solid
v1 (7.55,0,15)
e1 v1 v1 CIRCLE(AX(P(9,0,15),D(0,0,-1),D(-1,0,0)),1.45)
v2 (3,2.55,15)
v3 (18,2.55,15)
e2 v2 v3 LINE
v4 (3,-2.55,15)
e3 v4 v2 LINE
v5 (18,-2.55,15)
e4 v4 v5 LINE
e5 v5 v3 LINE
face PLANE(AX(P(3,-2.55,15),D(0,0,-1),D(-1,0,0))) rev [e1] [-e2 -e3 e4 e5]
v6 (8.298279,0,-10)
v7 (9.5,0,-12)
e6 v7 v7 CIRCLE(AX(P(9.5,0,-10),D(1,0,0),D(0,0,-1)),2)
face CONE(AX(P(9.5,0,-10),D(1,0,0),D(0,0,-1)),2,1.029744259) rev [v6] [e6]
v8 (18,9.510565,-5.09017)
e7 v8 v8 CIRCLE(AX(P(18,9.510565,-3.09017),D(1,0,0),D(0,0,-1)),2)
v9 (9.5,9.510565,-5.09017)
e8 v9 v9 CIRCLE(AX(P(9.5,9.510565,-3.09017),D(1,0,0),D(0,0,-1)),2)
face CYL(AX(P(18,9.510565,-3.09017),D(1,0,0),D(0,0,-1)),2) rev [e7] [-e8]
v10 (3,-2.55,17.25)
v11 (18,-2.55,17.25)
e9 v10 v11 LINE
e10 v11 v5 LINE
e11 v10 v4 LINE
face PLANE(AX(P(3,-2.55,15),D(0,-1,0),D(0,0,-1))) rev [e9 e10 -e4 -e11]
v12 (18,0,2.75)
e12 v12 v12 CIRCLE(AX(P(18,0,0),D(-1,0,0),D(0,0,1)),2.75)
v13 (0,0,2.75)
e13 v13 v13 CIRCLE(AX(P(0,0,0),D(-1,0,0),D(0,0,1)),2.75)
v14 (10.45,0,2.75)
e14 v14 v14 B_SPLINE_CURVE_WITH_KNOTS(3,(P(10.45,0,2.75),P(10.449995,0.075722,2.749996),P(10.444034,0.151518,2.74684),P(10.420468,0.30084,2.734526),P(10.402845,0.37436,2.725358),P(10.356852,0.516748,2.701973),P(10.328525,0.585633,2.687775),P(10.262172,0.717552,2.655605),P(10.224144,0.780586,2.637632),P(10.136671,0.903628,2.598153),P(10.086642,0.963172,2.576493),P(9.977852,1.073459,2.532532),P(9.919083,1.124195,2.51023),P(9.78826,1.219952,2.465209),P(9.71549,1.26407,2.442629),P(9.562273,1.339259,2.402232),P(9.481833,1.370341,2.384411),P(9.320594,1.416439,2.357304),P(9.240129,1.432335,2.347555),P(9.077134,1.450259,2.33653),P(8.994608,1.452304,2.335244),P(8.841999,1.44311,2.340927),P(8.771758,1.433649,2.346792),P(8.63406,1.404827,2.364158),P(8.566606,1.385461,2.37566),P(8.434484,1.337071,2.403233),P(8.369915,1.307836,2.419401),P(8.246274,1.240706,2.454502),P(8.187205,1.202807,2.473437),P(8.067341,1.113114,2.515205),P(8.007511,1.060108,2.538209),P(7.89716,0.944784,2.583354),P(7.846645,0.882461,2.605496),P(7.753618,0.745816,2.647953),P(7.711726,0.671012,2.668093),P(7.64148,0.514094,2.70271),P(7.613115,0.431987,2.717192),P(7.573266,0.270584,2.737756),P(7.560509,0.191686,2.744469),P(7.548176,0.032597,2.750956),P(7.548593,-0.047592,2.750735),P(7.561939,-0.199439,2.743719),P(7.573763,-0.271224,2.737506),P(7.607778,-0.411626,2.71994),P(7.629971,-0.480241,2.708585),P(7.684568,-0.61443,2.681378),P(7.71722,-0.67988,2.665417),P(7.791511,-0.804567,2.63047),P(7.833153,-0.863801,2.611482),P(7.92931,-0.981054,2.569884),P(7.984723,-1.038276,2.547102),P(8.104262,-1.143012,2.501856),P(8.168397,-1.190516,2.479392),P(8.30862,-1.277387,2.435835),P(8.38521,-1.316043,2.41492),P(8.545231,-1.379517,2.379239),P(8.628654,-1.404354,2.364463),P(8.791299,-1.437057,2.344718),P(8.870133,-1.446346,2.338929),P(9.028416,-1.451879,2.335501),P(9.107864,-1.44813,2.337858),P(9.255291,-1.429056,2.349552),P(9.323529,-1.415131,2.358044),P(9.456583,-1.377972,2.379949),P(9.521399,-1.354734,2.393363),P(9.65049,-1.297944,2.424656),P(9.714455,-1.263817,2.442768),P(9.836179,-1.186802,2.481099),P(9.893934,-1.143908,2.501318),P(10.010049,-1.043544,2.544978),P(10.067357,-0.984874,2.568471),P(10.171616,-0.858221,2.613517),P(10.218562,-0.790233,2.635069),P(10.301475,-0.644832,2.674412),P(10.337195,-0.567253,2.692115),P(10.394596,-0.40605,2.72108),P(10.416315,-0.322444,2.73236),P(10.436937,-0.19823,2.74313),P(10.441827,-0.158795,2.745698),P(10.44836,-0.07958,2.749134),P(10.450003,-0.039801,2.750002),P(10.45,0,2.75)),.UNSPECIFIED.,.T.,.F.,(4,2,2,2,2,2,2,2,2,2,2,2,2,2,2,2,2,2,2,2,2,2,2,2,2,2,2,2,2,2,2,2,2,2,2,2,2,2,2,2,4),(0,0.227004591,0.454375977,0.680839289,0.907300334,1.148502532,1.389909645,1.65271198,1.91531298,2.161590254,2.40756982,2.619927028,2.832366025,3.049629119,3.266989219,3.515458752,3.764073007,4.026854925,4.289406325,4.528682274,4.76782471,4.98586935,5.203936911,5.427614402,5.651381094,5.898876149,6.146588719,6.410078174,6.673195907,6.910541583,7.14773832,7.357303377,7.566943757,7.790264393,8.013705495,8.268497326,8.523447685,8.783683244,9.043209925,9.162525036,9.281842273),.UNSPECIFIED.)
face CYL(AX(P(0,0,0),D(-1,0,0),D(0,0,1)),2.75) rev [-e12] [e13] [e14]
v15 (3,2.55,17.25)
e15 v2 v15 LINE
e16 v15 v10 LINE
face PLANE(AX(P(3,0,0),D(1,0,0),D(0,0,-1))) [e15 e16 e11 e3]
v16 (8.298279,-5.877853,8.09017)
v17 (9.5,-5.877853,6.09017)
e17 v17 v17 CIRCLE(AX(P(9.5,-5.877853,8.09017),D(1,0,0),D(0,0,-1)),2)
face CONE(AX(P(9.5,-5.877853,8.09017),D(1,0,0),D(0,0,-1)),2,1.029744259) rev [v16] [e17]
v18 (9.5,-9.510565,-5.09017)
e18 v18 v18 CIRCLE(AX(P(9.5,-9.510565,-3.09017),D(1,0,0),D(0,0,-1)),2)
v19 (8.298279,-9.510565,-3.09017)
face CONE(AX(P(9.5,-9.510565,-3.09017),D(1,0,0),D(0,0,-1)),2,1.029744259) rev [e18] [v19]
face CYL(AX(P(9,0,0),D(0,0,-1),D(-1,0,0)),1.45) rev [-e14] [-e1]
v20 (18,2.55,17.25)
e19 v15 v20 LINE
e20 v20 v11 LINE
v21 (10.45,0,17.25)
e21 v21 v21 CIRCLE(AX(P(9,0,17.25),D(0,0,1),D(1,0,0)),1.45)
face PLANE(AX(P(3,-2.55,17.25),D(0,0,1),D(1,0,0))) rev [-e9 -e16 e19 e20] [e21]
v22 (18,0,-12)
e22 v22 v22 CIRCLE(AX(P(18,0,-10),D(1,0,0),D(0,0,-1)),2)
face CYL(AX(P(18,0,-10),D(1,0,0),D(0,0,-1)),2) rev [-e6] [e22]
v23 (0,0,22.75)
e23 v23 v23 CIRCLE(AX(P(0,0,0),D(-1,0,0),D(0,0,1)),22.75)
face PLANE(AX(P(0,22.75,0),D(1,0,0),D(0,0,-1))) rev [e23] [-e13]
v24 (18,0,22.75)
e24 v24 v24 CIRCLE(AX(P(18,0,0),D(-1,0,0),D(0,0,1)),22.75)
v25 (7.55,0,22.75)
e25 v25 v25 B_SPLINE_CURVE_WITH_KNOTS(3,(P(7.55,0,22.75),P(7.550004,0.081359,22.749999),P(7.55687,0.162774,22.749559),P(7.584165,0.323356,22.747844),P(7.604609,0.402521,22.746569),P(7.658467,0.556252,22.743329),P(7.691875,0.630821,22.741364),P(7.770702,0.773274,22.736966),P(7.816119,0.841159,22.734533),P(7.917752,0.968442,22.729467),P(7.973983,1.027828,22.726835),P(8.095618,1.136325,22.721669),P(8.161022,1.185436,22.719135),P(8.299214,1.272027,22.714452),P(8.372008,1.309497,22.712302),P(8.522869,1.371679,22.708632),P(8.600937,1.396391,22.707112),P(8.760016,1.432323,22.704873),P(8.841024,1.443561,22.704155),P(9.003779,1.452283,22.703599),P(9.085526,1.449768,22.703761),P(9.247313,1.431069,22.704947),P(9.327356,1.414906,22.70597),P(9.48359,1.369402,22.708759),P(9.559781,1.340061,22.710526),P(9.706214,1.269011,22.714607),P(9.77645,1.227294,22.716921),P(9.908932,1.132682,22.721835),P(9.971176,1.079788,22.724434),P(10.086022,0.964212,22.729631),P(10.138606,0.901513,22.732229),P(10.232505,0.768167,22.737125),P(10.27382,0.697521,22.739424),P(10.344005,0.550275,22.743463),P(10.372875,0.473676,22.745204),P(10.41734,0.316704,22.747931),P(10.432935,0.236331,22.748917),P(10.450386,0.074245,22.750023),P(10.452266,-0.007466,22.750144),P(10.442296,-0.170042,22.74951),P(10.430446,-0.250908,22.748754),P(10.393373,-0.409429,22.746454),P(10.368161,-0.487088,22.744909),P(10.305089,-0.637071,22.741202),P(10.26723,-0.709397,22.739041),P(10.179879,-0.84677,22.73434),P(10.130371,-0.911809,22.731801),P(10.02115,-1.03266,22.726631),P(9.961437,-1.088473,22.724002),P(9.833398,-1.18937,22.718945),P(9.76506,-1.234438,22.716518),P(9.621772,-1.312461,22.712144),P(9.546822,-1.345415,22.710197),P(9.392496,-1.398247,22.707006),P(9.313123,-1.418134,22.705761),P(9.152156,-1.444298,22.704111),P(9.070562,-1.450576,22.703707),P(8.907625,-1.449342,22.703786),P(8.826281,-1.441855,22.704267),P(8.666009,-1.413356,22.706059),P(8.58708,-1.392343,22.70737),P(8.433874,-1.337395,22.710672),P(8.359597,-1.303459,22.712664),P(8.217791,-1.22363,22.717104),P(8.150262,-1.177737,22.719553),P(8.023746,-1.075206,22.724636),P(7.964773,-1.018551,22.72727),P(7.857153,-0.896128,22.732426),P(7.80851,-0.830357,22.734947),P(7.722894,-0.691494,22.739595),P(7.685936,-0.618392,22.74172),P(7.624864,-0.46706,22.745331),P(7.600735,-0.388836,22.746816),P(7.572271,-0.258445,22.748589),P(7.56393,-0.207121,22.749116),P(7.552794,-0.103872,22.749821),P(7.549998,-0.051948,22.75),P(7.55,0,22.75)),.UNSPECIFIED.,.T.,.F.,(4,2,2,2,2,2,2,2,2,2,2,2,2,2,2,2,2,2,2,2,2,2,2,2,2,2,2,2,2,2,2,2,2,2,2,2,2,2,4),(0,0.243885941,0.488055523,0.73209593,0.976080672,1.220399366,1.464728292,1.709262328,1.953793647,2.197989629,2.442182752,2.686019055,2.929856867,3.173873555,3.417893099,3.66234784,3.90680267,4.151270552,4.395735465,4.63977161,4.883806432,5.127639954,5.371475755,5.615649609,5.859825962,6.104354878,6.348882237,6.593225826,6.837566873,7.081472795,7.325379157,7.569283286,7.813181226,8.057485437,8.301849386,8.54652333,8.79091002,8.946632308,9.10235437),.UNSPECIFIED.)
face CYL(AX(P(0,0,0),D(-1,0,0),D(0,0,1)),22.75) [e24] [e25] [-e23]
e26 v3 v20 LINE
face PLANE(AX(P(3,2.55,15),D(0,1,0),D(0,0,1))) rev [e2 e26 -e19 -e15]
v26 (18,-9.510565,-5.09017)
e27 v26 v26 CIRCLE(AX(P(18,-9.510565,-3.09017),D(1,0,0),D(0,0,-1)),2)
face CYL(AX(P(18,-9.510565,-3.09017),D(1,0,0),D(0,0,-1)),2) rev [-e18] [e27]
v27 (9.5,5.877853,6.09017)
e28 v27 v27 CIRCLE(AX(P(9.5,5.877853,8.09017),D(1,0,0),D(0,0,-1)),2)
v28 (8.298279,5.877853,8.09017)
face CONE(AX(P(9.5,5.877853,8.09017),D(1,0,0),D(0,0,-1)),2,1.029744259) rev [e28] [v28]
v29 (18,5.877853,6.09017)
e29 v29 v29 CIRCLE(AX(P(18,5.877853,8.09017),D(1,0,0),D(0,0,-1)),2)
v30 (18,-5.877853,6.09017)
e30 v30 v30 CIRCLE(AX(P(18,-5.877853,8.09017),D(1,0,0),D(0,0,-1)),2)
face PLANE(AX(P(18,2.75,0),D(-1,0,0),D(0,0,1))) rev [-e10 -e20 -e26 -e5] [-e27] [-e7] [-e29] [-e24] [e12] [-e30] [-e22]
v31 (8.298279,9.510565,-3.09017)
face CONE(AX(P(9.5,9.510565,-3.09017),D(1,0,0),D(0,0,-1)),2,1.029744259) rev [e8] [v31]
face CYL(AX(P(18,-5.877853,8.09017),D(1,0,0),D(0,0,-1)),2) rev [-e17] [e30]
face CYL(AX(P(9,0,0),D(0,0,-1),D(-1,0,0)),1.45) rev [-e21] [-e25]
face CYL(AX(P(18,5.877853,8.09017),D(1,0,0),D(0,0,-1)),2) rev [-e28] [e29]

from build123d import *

# Parameters (mm, degrees)
ESQUISSE1_W             = 18
ESQUISSE1_H             = 20
ESQUISSE4_W             = 2.25
ESQUISSE4_H             = 5.1
ENL_V_MAT_EXTRU_1_DEPTH = 15
ESQUISSE6_W             = 1.45
ESQUISSE6_H             = 22.75


# Read off the part's stored shape, not the designer's step: Diamètre du perçage Ø4.0 (4)1
with BuildPart() as part:
    # Esquisse1 → Révolution1 (revolve)
    with BuildSketch(Plane.XY, mode=Mode.PRIVATE) as r_volution1_sk:
        with Locations((9, 12.75)):
            Rectangle(ESQUISSE1_W, ESQUISSE1_H)
    revolve(r_volution1_sk.sketch.rotate(Axis((0, 0, 0), (1, 0, 0)), 90), axis=Axis((0, 0, 0), (1, 0, 0)))

    # Diamètre du perçage Ø4.0 (4)1 outline → Diamètre du perçage Ø4.0 (4)1 (revolve, cut)
    with BuildSketch(Plane(origin=(0, -9.510565163, -3.090169944), x_dir=(0, 1, 0), z_dir=(0, 0, -1))):
        Polygon((0, 18), (0, 8.298278762), (2, 9.5), (2, 18), align=None)
    revolve(axis=Axis((0, -9.510565163, -3.090169944), (1, 0, 0)), mode=Mode.SUBTRACT)

    # Diam_tre du per_age _4.0 _4_1 2 outline → Diam_tre du per_age _4.0 _4_1 2 (revolve, cut)
    with BuildSketch(Plane(origin=(0, -5.877852523, 8.090169944), x_dir=(0, 1, 0), z_dir=(0, 0, -1))):
        Polygon((0, 18), (0, 8.298278762), (2, 9.5), (2, 18), align=None)
    revolve(axis=Axis((0, -5.877852523, 8.090169944), (1, 0, 0)), mode=Mode.SUBTRACT)

    # Diam_tre du per_age _4.0 _4_1 3 outline → Diam_tre du per_age _4.0 _4_1 3 (revolve, cut)
    with BuildSketch(Plane(origin=(0, 5.877852523, 8.090169944), x_dir=(0, 1, 0), z_dir=(0, 0, -1))):
        Polygon((0, 18), (0, 8.298278762), (2, 9.5), (2, 18), align=None)
    revolve(axis=Axis((0, 5.877852523, 8.090169944), (1, 0, 0)), mode=Mode.SUBTRACT)

    # Diam_tre du per_age _4.0 _4_1 4 outline → Diam_tre du per_age _4.0 _4_1 4 (revolve, cut)
    with BuildSketch(Plane(origin=(0, 9.510565163, -3.090169944), x_dir=(0, 1, 0), z_dir=(0, 0, -1))):
        Polygon((0, 18), (0, 8.298278762), (2, 9.5), (2, 18), align=None)
    revolve(axis=Axis((0, 9.510565163, -3.090169944), (1, 0, 0)), mode=Mode.SUBTRACT)

    # Diam_tre du per_age _4.0 _4_1 5 outline → Diam_tre du per_age _4.0 _4_1 5 (revolve, cut)
    with BuildSketch(Plane.YX.offset(10)):
        Polygon((0, 18), (0, 8.298278762), (2, 9.5), (2, 18), align=None)
    revolve(axis=Axis((0, 0, -10), (1, 0, 0)), mode=Mode.SUBTRACT)

    # Esquisse4 → Enlèv. mat.-Extru.1 (cut)
    with BuildSketch(Plane(origin=(18, 0, 0), x_dir=(0, 0, -1), z_dir=(1, 0, 0))):
        with Locations((-16.125, 0)):
            Rectangle(ESQUISSE4_W, ESQUISSE4_H)
    extrude(amount=-ENL_V_MAT_EXTRU_1_DEPTH, mode=Mode.SUBTRACT)

    # Esquisse6 → Dégagement M2.51 (revolve, cut)
    with BuildSketch(Plane.YZ.offset(9)):
        with Locations((0.725, 11.375)):
            Rectangle(ESQUISSE6_W, ESQUISSE6_H)
    revolve(axis=Axis((9, 0, -6.35), (0, 0, 1)), mode=Mode.SUBTRACT)


solid = part.part
